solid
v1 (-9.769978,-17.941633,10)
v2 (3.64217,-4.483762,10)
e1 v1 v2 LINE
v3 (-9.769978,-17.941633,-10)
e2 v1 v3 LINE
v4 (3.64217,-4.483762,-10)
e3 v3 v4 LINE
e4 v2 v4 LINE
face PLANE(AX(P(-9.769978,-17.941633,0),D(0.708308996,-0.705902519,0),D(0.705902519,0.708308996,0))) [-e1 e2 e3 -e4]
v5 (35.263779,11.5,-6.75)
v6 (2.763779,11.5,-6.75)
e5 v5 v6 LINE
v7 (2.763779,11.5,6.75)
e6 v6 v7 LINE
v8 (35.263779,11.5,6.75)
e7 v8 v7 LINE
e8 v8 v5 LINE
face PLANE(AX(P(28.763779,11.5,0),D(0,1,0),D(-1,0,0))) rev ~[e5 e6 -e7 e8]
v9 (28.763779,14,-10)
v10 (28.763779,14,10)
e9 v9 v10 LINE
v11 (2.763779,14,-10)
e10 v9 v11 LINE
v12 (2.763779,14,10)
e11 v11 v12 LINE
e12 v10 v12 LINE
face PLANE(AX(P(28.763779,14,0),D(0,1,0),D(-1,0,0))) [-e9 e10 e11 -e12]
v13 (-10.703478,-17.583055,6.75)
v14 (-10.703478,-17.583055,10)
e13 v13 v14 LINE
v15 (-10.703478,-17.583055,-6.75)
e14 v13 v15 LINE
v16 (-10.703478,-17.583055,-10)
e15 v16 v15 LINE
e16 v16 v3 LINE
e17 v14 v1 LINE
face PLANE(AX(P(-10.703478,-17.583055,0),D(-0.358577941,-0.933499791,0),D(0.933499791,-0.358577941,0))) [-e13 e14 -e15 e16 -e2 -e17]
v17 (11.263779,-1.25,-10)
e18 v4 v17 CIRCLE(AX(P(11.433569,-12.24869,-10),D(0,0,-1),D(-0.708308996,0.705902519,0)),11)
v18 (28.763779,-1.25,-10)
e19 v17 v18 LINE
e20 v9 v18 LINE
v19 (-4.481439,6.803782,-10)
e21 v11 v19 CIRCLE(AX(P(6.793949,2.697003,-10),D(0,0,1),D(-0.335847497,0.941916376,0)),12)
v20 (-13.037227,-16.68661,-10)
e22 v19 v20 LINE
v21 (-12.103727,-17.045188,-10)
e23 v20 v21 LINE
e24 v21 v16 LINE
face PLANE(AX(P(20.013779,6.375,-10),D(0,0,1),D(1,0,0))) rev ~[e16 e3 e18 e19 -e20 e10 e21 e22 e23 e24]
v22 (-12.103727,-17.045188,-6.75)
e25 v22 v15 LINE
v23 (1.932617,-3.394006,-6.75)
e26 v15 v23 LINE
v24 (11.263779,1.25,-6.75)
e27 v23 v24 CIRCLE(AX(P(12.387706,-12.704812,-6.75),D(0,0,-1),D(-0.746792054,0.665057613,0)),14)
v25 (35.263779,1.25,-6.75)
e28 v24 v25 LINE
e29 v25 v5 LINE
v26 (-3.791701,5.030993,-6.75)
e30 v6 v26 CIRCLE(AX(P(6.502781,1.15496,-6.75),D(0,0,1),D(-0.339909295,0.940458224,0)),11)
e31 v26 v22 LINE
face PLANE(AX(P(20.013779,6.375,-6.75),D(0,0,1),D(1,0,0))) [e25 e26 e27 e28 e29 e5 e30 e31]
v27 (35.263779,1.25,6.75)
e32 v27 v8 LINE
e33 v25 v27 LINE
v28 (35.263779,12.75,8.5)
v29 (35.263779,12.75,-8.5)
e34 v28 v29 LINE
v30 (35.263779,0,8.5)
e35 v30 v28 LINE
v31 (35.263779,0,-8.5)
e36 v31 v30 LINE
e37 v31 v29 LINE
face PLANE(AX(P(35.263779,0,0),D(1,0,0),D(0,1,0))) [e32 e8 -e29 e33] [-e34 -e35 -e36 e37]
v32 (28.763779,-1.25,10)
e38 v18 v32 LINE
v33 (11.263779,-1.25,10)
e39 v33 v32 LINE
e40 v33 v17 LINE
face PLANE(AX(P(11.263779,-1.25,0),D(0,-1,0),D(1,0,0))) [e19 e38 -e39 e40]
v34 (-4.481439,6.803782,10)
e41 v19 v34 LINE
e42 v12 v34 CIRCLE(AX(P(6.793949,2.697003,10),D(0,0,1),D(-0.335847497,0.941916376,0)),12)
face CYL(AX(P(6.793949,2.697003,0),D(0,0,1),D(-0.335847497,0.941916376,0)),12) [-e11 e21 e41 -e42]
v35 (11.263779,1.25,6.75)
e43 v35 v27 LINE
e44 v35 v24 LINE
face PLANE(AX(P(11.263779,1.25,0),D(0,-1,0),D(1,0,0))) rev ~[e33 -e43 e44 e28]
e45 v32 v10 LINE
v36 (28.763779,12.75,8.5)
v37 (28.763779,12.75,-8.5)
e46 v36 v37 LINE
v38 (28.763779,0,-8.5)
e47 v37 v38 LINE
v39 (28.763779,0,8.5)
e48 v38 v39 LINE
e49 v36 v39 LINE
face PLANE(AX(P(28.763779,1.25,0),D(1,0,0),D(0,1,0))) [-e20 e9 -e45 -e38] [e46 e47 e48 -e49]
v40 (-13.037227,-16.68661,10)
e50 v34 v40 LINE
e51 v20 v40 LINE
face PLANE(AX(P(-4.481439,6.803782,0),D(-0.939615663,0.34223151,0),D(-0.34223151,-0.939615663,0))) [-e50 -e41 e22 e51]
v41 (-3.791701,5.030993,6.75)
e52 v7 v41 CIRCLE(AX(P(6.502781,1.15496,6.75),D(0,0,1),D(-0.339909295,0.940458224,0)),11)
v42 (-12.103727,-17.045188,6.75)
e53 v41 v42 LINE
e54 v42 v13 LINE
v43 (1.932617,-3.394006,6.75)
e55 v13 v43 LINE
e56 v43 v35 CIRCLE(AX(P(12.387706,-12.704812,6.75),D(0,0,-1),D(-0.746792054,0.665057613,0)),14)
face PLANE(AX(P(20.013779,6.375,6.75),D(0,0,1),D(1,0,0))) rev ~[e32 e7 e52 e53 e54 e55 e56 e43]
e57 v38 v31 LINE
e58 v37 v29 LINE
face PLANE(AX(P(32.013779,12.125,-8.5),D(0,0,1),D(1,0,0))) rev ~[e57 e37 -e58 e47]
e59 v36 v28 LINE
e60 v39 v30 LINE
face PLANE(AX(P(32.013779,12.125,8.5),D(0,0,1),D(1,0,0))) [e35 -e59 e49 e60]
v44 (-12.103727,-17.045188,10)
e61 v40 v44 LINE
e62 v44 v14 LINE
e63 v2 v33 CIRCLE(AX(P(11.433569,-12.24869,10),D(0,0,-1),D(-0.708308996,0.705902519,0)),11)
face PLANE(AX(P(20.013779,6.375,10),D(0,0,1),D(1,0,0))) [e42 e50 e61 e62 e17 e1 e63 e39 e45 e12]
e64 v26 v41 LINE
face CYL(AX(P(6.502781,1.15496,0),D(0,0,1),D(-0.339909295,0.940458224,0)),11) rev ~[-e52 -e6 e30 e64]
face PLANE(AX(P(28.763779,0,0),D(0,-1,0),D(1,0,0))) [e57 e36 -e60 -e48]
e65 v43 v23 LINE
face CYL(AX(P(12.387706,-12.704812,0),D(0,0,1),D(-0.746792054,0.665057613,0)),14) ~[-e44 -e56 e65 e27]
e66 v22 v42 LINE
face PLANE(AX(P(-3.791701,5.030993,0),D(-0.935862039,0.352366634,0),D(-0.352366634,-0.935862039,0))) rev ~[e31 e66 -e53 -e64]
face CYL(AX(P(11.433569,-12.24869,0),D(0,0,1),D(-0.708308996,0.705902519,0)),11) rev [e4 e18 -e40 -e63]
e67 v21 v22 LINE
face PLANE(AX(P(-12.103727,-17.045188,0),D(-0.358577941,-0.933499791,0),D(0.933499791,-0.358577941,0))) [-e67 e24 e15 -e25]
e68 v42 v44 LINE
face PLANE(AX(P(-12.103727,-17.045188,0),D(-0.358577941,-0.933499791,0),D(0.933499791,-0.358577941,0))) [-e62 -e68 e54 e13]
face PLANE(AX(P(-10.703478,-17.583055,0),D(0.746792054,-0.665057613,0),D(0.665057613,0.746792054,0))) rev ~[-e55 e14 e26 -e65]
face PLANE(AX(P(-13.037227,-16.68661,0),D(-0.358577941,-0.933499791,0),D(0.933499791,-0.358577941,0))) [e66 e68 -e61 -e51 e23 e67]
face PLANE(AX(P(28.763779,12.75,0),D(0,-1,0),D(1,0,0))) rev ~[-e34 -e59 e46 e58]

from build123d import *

# Parameters (mm, degrees)
F0_W     = 17.5
F0_H     = 1.25
F1_DEPTH = 10
F0_H_2   = 10.25
F2_DEPTH = 10
F0_W_2   = 6.5
F3_DEPTH = 8.5
F4_DEPTH = 6.75
F5_DEPTH = 6.75


# Not quite as in the source:
# - a feature names something its author has since deleted; it is built from what else it names


with BuildPart() as f1:
    # F0 (on Top) → F1 (new body, symmetric)
    with BuildSketch(Plane.XY):
        with Locations((20.0137786908, 13.375)):
            Rectangle(F0_W, F0_H)
        with Locations((20.0137786908, 12.125)):
            Rectangle(F0_W, F0_H)
        with BuildLine():
            Line((2.7637786908, 11.5), (11.2637786908, 11.5))
            Line((11.2637786908, 11.5), (11.2637786908, 12.75))
            Line((11.2637786908, 12.75), (11.2637786908, 14))
            Line((11.2637786908, 14), (2.7637786908, 14))
            ThreePointArc((2.7637786908, 14), (-1.6624935941, 11.2110263052), (-4.4814392939, 6.8037816159))
            Line((-4.4814392939, 6.8037816159), (-13.0372270502, -16.686609949))
            Line((-13.0372270502, -16.686609949), (-12.1037272591, -17.0451878901))
            Line((-12.1037272591, -17.0451878901), (-3.7917014922, 5.0309925083))
            ThreePointArc((-3.7917014922, 5.0309925083), (-1.2235822128, 8.9846027287), (2.7637786908, 11.5))
        make_face()
    extrude(amount=F1_DEPTH, both=True)



with BuildPart() as f1b:
    # F0 (on Top) → F1, piece 2 (new body, symmetric)
    with BuildSketch(Plane.XY):
        with Locations((20.0137786908, 0.625)):
            Rectangle(F0_W, F0_H)
        with Locations((20.0137786908, -0.625)):
            Rectangle(F0_W, F0_H)
        with BuildLine():
            Line((11.2637786908, -1.25), (11.2637786908, 0))
            Line((11.2637786908, 0), (11.2637786908, 1.25))
            ThreePointArc((11.2637786908, 1.25), (6.1499097664, -0.1712613654), (1.9326170674, -3.3940057761))
            Line((1.9326170674, -3.3940057761), (-10.7034775723, -17.5830548019))
            Line((-10.7034775723, -17.5830548019), (-9.7699777812, -17.9416327431))
            Line((-9.7699777812, -17.9416327431), (3.6421700758, -4.483761817))
            ThreePointArc((3.6421700758, -4.483761817), (7.1371242658, -2.1224581239), (11.2637786908, -1.25))
        make_face()
    extrude(amount=F1_DEPTH, both=True)


with BuildPart() as f1_1:
    add(f1.part)

    add(f1b.part)  # F2 merges F1b
    # F0 (on Top) → F2 (join, symmetric)
    with BuildSketch(Plane.XY):
        with Locations((20.0137786908, 6.375)):
            Rectangle(F0_W, F0_H_2)
        with BuildLine():
            ThreePointArc((1.9326170674, -3.3940057761), (6.1499097664, -0.1712613654), (11.2637786908, 1.25))
            Line((11.2637786908, 1.25), (11.2637786908, 11.5))
            Line((11.2637786908, 11.5), (2.7637786908, 11.5))
            ThreePointArc((2.7637786908, 11.5), (-1.2235822128, 8.9846027287), (-3.7917014922, 5.0309925083))
            Line((-3.7917014922, 5.0309925083), (-12.1037272591, -17.0451878901))
            Line((-12.1037272591, -17.0451878901), (-10.7034775723, -17.5830548019))
            Line((-10.7034775723, -17.5830548019), (1.9326170674, -3.3940057761))
        make_face()
    extrude(amount=F2_DEPTH, both=True)

    # F0 (on Top) → F3 (join, symmetric)
    with BuildSketch(Plane.XY):
        with Locations((32.0137786908, 12.125)):
            Rectangle(F0_W_2, F0_H)
        with Locations((32.0137786908, 6.375)):
            Rectangle(F0_W_2, F0_H_2)
        with Locations((32.0137786908, 0.625)):
            Rectangle(F0_W_2, F0_H)
    extrude(amount=F3_DEPTH, both=True)

    # F0 (on Top) → F4 (cut, symmetric)
    with BuildSketch(Plane.XY):
        with Locations((20.0137786908, 6.375)):
            Rectangle(F0_W, F0_H_2)
        with BuildLine():
            ThreePointArc((1.9326170674, -3.3940057761), (6.1499097664, -0.1712613654), (11.2637786908, 1.25))
            Line((11.2637786908, 1.25), (11.2637786908, 11.5))
            Line((11.2637786908, 11.5), (2.7637786908, 11.5))
            ThreePointArc((2.7637786908, 11.5), (-1.2235822128, 8.9846027287), (-3.7917014922, 5.0309925083))
            Line((-3.7917014922, 5.0309925083), (-12.1037272591, -17.0451878901))
            Line((-12.1037272591, -17.0451878901), (-10.7034775723, -17.5830548019))
            Line((-10.7034775723, -17.5830548019), (1.9326170674, -3.3940057761))
        make_face()
    extrude(amount=F4_DEPTH, both=True, mode=Mode.SUBTRACT)

    # F0 (on Top) → F5 (cut, symmetric)
    with BuildSketch(Plane.XY):
        with Locations((32.0137786908, 6.375)):
            Rectangle(F0_W_2, F0_H_2)
    extrude(amount=F5_DEPTH, both=True, mode=Mode.SUBTRACT)


solid = f1_1.part
